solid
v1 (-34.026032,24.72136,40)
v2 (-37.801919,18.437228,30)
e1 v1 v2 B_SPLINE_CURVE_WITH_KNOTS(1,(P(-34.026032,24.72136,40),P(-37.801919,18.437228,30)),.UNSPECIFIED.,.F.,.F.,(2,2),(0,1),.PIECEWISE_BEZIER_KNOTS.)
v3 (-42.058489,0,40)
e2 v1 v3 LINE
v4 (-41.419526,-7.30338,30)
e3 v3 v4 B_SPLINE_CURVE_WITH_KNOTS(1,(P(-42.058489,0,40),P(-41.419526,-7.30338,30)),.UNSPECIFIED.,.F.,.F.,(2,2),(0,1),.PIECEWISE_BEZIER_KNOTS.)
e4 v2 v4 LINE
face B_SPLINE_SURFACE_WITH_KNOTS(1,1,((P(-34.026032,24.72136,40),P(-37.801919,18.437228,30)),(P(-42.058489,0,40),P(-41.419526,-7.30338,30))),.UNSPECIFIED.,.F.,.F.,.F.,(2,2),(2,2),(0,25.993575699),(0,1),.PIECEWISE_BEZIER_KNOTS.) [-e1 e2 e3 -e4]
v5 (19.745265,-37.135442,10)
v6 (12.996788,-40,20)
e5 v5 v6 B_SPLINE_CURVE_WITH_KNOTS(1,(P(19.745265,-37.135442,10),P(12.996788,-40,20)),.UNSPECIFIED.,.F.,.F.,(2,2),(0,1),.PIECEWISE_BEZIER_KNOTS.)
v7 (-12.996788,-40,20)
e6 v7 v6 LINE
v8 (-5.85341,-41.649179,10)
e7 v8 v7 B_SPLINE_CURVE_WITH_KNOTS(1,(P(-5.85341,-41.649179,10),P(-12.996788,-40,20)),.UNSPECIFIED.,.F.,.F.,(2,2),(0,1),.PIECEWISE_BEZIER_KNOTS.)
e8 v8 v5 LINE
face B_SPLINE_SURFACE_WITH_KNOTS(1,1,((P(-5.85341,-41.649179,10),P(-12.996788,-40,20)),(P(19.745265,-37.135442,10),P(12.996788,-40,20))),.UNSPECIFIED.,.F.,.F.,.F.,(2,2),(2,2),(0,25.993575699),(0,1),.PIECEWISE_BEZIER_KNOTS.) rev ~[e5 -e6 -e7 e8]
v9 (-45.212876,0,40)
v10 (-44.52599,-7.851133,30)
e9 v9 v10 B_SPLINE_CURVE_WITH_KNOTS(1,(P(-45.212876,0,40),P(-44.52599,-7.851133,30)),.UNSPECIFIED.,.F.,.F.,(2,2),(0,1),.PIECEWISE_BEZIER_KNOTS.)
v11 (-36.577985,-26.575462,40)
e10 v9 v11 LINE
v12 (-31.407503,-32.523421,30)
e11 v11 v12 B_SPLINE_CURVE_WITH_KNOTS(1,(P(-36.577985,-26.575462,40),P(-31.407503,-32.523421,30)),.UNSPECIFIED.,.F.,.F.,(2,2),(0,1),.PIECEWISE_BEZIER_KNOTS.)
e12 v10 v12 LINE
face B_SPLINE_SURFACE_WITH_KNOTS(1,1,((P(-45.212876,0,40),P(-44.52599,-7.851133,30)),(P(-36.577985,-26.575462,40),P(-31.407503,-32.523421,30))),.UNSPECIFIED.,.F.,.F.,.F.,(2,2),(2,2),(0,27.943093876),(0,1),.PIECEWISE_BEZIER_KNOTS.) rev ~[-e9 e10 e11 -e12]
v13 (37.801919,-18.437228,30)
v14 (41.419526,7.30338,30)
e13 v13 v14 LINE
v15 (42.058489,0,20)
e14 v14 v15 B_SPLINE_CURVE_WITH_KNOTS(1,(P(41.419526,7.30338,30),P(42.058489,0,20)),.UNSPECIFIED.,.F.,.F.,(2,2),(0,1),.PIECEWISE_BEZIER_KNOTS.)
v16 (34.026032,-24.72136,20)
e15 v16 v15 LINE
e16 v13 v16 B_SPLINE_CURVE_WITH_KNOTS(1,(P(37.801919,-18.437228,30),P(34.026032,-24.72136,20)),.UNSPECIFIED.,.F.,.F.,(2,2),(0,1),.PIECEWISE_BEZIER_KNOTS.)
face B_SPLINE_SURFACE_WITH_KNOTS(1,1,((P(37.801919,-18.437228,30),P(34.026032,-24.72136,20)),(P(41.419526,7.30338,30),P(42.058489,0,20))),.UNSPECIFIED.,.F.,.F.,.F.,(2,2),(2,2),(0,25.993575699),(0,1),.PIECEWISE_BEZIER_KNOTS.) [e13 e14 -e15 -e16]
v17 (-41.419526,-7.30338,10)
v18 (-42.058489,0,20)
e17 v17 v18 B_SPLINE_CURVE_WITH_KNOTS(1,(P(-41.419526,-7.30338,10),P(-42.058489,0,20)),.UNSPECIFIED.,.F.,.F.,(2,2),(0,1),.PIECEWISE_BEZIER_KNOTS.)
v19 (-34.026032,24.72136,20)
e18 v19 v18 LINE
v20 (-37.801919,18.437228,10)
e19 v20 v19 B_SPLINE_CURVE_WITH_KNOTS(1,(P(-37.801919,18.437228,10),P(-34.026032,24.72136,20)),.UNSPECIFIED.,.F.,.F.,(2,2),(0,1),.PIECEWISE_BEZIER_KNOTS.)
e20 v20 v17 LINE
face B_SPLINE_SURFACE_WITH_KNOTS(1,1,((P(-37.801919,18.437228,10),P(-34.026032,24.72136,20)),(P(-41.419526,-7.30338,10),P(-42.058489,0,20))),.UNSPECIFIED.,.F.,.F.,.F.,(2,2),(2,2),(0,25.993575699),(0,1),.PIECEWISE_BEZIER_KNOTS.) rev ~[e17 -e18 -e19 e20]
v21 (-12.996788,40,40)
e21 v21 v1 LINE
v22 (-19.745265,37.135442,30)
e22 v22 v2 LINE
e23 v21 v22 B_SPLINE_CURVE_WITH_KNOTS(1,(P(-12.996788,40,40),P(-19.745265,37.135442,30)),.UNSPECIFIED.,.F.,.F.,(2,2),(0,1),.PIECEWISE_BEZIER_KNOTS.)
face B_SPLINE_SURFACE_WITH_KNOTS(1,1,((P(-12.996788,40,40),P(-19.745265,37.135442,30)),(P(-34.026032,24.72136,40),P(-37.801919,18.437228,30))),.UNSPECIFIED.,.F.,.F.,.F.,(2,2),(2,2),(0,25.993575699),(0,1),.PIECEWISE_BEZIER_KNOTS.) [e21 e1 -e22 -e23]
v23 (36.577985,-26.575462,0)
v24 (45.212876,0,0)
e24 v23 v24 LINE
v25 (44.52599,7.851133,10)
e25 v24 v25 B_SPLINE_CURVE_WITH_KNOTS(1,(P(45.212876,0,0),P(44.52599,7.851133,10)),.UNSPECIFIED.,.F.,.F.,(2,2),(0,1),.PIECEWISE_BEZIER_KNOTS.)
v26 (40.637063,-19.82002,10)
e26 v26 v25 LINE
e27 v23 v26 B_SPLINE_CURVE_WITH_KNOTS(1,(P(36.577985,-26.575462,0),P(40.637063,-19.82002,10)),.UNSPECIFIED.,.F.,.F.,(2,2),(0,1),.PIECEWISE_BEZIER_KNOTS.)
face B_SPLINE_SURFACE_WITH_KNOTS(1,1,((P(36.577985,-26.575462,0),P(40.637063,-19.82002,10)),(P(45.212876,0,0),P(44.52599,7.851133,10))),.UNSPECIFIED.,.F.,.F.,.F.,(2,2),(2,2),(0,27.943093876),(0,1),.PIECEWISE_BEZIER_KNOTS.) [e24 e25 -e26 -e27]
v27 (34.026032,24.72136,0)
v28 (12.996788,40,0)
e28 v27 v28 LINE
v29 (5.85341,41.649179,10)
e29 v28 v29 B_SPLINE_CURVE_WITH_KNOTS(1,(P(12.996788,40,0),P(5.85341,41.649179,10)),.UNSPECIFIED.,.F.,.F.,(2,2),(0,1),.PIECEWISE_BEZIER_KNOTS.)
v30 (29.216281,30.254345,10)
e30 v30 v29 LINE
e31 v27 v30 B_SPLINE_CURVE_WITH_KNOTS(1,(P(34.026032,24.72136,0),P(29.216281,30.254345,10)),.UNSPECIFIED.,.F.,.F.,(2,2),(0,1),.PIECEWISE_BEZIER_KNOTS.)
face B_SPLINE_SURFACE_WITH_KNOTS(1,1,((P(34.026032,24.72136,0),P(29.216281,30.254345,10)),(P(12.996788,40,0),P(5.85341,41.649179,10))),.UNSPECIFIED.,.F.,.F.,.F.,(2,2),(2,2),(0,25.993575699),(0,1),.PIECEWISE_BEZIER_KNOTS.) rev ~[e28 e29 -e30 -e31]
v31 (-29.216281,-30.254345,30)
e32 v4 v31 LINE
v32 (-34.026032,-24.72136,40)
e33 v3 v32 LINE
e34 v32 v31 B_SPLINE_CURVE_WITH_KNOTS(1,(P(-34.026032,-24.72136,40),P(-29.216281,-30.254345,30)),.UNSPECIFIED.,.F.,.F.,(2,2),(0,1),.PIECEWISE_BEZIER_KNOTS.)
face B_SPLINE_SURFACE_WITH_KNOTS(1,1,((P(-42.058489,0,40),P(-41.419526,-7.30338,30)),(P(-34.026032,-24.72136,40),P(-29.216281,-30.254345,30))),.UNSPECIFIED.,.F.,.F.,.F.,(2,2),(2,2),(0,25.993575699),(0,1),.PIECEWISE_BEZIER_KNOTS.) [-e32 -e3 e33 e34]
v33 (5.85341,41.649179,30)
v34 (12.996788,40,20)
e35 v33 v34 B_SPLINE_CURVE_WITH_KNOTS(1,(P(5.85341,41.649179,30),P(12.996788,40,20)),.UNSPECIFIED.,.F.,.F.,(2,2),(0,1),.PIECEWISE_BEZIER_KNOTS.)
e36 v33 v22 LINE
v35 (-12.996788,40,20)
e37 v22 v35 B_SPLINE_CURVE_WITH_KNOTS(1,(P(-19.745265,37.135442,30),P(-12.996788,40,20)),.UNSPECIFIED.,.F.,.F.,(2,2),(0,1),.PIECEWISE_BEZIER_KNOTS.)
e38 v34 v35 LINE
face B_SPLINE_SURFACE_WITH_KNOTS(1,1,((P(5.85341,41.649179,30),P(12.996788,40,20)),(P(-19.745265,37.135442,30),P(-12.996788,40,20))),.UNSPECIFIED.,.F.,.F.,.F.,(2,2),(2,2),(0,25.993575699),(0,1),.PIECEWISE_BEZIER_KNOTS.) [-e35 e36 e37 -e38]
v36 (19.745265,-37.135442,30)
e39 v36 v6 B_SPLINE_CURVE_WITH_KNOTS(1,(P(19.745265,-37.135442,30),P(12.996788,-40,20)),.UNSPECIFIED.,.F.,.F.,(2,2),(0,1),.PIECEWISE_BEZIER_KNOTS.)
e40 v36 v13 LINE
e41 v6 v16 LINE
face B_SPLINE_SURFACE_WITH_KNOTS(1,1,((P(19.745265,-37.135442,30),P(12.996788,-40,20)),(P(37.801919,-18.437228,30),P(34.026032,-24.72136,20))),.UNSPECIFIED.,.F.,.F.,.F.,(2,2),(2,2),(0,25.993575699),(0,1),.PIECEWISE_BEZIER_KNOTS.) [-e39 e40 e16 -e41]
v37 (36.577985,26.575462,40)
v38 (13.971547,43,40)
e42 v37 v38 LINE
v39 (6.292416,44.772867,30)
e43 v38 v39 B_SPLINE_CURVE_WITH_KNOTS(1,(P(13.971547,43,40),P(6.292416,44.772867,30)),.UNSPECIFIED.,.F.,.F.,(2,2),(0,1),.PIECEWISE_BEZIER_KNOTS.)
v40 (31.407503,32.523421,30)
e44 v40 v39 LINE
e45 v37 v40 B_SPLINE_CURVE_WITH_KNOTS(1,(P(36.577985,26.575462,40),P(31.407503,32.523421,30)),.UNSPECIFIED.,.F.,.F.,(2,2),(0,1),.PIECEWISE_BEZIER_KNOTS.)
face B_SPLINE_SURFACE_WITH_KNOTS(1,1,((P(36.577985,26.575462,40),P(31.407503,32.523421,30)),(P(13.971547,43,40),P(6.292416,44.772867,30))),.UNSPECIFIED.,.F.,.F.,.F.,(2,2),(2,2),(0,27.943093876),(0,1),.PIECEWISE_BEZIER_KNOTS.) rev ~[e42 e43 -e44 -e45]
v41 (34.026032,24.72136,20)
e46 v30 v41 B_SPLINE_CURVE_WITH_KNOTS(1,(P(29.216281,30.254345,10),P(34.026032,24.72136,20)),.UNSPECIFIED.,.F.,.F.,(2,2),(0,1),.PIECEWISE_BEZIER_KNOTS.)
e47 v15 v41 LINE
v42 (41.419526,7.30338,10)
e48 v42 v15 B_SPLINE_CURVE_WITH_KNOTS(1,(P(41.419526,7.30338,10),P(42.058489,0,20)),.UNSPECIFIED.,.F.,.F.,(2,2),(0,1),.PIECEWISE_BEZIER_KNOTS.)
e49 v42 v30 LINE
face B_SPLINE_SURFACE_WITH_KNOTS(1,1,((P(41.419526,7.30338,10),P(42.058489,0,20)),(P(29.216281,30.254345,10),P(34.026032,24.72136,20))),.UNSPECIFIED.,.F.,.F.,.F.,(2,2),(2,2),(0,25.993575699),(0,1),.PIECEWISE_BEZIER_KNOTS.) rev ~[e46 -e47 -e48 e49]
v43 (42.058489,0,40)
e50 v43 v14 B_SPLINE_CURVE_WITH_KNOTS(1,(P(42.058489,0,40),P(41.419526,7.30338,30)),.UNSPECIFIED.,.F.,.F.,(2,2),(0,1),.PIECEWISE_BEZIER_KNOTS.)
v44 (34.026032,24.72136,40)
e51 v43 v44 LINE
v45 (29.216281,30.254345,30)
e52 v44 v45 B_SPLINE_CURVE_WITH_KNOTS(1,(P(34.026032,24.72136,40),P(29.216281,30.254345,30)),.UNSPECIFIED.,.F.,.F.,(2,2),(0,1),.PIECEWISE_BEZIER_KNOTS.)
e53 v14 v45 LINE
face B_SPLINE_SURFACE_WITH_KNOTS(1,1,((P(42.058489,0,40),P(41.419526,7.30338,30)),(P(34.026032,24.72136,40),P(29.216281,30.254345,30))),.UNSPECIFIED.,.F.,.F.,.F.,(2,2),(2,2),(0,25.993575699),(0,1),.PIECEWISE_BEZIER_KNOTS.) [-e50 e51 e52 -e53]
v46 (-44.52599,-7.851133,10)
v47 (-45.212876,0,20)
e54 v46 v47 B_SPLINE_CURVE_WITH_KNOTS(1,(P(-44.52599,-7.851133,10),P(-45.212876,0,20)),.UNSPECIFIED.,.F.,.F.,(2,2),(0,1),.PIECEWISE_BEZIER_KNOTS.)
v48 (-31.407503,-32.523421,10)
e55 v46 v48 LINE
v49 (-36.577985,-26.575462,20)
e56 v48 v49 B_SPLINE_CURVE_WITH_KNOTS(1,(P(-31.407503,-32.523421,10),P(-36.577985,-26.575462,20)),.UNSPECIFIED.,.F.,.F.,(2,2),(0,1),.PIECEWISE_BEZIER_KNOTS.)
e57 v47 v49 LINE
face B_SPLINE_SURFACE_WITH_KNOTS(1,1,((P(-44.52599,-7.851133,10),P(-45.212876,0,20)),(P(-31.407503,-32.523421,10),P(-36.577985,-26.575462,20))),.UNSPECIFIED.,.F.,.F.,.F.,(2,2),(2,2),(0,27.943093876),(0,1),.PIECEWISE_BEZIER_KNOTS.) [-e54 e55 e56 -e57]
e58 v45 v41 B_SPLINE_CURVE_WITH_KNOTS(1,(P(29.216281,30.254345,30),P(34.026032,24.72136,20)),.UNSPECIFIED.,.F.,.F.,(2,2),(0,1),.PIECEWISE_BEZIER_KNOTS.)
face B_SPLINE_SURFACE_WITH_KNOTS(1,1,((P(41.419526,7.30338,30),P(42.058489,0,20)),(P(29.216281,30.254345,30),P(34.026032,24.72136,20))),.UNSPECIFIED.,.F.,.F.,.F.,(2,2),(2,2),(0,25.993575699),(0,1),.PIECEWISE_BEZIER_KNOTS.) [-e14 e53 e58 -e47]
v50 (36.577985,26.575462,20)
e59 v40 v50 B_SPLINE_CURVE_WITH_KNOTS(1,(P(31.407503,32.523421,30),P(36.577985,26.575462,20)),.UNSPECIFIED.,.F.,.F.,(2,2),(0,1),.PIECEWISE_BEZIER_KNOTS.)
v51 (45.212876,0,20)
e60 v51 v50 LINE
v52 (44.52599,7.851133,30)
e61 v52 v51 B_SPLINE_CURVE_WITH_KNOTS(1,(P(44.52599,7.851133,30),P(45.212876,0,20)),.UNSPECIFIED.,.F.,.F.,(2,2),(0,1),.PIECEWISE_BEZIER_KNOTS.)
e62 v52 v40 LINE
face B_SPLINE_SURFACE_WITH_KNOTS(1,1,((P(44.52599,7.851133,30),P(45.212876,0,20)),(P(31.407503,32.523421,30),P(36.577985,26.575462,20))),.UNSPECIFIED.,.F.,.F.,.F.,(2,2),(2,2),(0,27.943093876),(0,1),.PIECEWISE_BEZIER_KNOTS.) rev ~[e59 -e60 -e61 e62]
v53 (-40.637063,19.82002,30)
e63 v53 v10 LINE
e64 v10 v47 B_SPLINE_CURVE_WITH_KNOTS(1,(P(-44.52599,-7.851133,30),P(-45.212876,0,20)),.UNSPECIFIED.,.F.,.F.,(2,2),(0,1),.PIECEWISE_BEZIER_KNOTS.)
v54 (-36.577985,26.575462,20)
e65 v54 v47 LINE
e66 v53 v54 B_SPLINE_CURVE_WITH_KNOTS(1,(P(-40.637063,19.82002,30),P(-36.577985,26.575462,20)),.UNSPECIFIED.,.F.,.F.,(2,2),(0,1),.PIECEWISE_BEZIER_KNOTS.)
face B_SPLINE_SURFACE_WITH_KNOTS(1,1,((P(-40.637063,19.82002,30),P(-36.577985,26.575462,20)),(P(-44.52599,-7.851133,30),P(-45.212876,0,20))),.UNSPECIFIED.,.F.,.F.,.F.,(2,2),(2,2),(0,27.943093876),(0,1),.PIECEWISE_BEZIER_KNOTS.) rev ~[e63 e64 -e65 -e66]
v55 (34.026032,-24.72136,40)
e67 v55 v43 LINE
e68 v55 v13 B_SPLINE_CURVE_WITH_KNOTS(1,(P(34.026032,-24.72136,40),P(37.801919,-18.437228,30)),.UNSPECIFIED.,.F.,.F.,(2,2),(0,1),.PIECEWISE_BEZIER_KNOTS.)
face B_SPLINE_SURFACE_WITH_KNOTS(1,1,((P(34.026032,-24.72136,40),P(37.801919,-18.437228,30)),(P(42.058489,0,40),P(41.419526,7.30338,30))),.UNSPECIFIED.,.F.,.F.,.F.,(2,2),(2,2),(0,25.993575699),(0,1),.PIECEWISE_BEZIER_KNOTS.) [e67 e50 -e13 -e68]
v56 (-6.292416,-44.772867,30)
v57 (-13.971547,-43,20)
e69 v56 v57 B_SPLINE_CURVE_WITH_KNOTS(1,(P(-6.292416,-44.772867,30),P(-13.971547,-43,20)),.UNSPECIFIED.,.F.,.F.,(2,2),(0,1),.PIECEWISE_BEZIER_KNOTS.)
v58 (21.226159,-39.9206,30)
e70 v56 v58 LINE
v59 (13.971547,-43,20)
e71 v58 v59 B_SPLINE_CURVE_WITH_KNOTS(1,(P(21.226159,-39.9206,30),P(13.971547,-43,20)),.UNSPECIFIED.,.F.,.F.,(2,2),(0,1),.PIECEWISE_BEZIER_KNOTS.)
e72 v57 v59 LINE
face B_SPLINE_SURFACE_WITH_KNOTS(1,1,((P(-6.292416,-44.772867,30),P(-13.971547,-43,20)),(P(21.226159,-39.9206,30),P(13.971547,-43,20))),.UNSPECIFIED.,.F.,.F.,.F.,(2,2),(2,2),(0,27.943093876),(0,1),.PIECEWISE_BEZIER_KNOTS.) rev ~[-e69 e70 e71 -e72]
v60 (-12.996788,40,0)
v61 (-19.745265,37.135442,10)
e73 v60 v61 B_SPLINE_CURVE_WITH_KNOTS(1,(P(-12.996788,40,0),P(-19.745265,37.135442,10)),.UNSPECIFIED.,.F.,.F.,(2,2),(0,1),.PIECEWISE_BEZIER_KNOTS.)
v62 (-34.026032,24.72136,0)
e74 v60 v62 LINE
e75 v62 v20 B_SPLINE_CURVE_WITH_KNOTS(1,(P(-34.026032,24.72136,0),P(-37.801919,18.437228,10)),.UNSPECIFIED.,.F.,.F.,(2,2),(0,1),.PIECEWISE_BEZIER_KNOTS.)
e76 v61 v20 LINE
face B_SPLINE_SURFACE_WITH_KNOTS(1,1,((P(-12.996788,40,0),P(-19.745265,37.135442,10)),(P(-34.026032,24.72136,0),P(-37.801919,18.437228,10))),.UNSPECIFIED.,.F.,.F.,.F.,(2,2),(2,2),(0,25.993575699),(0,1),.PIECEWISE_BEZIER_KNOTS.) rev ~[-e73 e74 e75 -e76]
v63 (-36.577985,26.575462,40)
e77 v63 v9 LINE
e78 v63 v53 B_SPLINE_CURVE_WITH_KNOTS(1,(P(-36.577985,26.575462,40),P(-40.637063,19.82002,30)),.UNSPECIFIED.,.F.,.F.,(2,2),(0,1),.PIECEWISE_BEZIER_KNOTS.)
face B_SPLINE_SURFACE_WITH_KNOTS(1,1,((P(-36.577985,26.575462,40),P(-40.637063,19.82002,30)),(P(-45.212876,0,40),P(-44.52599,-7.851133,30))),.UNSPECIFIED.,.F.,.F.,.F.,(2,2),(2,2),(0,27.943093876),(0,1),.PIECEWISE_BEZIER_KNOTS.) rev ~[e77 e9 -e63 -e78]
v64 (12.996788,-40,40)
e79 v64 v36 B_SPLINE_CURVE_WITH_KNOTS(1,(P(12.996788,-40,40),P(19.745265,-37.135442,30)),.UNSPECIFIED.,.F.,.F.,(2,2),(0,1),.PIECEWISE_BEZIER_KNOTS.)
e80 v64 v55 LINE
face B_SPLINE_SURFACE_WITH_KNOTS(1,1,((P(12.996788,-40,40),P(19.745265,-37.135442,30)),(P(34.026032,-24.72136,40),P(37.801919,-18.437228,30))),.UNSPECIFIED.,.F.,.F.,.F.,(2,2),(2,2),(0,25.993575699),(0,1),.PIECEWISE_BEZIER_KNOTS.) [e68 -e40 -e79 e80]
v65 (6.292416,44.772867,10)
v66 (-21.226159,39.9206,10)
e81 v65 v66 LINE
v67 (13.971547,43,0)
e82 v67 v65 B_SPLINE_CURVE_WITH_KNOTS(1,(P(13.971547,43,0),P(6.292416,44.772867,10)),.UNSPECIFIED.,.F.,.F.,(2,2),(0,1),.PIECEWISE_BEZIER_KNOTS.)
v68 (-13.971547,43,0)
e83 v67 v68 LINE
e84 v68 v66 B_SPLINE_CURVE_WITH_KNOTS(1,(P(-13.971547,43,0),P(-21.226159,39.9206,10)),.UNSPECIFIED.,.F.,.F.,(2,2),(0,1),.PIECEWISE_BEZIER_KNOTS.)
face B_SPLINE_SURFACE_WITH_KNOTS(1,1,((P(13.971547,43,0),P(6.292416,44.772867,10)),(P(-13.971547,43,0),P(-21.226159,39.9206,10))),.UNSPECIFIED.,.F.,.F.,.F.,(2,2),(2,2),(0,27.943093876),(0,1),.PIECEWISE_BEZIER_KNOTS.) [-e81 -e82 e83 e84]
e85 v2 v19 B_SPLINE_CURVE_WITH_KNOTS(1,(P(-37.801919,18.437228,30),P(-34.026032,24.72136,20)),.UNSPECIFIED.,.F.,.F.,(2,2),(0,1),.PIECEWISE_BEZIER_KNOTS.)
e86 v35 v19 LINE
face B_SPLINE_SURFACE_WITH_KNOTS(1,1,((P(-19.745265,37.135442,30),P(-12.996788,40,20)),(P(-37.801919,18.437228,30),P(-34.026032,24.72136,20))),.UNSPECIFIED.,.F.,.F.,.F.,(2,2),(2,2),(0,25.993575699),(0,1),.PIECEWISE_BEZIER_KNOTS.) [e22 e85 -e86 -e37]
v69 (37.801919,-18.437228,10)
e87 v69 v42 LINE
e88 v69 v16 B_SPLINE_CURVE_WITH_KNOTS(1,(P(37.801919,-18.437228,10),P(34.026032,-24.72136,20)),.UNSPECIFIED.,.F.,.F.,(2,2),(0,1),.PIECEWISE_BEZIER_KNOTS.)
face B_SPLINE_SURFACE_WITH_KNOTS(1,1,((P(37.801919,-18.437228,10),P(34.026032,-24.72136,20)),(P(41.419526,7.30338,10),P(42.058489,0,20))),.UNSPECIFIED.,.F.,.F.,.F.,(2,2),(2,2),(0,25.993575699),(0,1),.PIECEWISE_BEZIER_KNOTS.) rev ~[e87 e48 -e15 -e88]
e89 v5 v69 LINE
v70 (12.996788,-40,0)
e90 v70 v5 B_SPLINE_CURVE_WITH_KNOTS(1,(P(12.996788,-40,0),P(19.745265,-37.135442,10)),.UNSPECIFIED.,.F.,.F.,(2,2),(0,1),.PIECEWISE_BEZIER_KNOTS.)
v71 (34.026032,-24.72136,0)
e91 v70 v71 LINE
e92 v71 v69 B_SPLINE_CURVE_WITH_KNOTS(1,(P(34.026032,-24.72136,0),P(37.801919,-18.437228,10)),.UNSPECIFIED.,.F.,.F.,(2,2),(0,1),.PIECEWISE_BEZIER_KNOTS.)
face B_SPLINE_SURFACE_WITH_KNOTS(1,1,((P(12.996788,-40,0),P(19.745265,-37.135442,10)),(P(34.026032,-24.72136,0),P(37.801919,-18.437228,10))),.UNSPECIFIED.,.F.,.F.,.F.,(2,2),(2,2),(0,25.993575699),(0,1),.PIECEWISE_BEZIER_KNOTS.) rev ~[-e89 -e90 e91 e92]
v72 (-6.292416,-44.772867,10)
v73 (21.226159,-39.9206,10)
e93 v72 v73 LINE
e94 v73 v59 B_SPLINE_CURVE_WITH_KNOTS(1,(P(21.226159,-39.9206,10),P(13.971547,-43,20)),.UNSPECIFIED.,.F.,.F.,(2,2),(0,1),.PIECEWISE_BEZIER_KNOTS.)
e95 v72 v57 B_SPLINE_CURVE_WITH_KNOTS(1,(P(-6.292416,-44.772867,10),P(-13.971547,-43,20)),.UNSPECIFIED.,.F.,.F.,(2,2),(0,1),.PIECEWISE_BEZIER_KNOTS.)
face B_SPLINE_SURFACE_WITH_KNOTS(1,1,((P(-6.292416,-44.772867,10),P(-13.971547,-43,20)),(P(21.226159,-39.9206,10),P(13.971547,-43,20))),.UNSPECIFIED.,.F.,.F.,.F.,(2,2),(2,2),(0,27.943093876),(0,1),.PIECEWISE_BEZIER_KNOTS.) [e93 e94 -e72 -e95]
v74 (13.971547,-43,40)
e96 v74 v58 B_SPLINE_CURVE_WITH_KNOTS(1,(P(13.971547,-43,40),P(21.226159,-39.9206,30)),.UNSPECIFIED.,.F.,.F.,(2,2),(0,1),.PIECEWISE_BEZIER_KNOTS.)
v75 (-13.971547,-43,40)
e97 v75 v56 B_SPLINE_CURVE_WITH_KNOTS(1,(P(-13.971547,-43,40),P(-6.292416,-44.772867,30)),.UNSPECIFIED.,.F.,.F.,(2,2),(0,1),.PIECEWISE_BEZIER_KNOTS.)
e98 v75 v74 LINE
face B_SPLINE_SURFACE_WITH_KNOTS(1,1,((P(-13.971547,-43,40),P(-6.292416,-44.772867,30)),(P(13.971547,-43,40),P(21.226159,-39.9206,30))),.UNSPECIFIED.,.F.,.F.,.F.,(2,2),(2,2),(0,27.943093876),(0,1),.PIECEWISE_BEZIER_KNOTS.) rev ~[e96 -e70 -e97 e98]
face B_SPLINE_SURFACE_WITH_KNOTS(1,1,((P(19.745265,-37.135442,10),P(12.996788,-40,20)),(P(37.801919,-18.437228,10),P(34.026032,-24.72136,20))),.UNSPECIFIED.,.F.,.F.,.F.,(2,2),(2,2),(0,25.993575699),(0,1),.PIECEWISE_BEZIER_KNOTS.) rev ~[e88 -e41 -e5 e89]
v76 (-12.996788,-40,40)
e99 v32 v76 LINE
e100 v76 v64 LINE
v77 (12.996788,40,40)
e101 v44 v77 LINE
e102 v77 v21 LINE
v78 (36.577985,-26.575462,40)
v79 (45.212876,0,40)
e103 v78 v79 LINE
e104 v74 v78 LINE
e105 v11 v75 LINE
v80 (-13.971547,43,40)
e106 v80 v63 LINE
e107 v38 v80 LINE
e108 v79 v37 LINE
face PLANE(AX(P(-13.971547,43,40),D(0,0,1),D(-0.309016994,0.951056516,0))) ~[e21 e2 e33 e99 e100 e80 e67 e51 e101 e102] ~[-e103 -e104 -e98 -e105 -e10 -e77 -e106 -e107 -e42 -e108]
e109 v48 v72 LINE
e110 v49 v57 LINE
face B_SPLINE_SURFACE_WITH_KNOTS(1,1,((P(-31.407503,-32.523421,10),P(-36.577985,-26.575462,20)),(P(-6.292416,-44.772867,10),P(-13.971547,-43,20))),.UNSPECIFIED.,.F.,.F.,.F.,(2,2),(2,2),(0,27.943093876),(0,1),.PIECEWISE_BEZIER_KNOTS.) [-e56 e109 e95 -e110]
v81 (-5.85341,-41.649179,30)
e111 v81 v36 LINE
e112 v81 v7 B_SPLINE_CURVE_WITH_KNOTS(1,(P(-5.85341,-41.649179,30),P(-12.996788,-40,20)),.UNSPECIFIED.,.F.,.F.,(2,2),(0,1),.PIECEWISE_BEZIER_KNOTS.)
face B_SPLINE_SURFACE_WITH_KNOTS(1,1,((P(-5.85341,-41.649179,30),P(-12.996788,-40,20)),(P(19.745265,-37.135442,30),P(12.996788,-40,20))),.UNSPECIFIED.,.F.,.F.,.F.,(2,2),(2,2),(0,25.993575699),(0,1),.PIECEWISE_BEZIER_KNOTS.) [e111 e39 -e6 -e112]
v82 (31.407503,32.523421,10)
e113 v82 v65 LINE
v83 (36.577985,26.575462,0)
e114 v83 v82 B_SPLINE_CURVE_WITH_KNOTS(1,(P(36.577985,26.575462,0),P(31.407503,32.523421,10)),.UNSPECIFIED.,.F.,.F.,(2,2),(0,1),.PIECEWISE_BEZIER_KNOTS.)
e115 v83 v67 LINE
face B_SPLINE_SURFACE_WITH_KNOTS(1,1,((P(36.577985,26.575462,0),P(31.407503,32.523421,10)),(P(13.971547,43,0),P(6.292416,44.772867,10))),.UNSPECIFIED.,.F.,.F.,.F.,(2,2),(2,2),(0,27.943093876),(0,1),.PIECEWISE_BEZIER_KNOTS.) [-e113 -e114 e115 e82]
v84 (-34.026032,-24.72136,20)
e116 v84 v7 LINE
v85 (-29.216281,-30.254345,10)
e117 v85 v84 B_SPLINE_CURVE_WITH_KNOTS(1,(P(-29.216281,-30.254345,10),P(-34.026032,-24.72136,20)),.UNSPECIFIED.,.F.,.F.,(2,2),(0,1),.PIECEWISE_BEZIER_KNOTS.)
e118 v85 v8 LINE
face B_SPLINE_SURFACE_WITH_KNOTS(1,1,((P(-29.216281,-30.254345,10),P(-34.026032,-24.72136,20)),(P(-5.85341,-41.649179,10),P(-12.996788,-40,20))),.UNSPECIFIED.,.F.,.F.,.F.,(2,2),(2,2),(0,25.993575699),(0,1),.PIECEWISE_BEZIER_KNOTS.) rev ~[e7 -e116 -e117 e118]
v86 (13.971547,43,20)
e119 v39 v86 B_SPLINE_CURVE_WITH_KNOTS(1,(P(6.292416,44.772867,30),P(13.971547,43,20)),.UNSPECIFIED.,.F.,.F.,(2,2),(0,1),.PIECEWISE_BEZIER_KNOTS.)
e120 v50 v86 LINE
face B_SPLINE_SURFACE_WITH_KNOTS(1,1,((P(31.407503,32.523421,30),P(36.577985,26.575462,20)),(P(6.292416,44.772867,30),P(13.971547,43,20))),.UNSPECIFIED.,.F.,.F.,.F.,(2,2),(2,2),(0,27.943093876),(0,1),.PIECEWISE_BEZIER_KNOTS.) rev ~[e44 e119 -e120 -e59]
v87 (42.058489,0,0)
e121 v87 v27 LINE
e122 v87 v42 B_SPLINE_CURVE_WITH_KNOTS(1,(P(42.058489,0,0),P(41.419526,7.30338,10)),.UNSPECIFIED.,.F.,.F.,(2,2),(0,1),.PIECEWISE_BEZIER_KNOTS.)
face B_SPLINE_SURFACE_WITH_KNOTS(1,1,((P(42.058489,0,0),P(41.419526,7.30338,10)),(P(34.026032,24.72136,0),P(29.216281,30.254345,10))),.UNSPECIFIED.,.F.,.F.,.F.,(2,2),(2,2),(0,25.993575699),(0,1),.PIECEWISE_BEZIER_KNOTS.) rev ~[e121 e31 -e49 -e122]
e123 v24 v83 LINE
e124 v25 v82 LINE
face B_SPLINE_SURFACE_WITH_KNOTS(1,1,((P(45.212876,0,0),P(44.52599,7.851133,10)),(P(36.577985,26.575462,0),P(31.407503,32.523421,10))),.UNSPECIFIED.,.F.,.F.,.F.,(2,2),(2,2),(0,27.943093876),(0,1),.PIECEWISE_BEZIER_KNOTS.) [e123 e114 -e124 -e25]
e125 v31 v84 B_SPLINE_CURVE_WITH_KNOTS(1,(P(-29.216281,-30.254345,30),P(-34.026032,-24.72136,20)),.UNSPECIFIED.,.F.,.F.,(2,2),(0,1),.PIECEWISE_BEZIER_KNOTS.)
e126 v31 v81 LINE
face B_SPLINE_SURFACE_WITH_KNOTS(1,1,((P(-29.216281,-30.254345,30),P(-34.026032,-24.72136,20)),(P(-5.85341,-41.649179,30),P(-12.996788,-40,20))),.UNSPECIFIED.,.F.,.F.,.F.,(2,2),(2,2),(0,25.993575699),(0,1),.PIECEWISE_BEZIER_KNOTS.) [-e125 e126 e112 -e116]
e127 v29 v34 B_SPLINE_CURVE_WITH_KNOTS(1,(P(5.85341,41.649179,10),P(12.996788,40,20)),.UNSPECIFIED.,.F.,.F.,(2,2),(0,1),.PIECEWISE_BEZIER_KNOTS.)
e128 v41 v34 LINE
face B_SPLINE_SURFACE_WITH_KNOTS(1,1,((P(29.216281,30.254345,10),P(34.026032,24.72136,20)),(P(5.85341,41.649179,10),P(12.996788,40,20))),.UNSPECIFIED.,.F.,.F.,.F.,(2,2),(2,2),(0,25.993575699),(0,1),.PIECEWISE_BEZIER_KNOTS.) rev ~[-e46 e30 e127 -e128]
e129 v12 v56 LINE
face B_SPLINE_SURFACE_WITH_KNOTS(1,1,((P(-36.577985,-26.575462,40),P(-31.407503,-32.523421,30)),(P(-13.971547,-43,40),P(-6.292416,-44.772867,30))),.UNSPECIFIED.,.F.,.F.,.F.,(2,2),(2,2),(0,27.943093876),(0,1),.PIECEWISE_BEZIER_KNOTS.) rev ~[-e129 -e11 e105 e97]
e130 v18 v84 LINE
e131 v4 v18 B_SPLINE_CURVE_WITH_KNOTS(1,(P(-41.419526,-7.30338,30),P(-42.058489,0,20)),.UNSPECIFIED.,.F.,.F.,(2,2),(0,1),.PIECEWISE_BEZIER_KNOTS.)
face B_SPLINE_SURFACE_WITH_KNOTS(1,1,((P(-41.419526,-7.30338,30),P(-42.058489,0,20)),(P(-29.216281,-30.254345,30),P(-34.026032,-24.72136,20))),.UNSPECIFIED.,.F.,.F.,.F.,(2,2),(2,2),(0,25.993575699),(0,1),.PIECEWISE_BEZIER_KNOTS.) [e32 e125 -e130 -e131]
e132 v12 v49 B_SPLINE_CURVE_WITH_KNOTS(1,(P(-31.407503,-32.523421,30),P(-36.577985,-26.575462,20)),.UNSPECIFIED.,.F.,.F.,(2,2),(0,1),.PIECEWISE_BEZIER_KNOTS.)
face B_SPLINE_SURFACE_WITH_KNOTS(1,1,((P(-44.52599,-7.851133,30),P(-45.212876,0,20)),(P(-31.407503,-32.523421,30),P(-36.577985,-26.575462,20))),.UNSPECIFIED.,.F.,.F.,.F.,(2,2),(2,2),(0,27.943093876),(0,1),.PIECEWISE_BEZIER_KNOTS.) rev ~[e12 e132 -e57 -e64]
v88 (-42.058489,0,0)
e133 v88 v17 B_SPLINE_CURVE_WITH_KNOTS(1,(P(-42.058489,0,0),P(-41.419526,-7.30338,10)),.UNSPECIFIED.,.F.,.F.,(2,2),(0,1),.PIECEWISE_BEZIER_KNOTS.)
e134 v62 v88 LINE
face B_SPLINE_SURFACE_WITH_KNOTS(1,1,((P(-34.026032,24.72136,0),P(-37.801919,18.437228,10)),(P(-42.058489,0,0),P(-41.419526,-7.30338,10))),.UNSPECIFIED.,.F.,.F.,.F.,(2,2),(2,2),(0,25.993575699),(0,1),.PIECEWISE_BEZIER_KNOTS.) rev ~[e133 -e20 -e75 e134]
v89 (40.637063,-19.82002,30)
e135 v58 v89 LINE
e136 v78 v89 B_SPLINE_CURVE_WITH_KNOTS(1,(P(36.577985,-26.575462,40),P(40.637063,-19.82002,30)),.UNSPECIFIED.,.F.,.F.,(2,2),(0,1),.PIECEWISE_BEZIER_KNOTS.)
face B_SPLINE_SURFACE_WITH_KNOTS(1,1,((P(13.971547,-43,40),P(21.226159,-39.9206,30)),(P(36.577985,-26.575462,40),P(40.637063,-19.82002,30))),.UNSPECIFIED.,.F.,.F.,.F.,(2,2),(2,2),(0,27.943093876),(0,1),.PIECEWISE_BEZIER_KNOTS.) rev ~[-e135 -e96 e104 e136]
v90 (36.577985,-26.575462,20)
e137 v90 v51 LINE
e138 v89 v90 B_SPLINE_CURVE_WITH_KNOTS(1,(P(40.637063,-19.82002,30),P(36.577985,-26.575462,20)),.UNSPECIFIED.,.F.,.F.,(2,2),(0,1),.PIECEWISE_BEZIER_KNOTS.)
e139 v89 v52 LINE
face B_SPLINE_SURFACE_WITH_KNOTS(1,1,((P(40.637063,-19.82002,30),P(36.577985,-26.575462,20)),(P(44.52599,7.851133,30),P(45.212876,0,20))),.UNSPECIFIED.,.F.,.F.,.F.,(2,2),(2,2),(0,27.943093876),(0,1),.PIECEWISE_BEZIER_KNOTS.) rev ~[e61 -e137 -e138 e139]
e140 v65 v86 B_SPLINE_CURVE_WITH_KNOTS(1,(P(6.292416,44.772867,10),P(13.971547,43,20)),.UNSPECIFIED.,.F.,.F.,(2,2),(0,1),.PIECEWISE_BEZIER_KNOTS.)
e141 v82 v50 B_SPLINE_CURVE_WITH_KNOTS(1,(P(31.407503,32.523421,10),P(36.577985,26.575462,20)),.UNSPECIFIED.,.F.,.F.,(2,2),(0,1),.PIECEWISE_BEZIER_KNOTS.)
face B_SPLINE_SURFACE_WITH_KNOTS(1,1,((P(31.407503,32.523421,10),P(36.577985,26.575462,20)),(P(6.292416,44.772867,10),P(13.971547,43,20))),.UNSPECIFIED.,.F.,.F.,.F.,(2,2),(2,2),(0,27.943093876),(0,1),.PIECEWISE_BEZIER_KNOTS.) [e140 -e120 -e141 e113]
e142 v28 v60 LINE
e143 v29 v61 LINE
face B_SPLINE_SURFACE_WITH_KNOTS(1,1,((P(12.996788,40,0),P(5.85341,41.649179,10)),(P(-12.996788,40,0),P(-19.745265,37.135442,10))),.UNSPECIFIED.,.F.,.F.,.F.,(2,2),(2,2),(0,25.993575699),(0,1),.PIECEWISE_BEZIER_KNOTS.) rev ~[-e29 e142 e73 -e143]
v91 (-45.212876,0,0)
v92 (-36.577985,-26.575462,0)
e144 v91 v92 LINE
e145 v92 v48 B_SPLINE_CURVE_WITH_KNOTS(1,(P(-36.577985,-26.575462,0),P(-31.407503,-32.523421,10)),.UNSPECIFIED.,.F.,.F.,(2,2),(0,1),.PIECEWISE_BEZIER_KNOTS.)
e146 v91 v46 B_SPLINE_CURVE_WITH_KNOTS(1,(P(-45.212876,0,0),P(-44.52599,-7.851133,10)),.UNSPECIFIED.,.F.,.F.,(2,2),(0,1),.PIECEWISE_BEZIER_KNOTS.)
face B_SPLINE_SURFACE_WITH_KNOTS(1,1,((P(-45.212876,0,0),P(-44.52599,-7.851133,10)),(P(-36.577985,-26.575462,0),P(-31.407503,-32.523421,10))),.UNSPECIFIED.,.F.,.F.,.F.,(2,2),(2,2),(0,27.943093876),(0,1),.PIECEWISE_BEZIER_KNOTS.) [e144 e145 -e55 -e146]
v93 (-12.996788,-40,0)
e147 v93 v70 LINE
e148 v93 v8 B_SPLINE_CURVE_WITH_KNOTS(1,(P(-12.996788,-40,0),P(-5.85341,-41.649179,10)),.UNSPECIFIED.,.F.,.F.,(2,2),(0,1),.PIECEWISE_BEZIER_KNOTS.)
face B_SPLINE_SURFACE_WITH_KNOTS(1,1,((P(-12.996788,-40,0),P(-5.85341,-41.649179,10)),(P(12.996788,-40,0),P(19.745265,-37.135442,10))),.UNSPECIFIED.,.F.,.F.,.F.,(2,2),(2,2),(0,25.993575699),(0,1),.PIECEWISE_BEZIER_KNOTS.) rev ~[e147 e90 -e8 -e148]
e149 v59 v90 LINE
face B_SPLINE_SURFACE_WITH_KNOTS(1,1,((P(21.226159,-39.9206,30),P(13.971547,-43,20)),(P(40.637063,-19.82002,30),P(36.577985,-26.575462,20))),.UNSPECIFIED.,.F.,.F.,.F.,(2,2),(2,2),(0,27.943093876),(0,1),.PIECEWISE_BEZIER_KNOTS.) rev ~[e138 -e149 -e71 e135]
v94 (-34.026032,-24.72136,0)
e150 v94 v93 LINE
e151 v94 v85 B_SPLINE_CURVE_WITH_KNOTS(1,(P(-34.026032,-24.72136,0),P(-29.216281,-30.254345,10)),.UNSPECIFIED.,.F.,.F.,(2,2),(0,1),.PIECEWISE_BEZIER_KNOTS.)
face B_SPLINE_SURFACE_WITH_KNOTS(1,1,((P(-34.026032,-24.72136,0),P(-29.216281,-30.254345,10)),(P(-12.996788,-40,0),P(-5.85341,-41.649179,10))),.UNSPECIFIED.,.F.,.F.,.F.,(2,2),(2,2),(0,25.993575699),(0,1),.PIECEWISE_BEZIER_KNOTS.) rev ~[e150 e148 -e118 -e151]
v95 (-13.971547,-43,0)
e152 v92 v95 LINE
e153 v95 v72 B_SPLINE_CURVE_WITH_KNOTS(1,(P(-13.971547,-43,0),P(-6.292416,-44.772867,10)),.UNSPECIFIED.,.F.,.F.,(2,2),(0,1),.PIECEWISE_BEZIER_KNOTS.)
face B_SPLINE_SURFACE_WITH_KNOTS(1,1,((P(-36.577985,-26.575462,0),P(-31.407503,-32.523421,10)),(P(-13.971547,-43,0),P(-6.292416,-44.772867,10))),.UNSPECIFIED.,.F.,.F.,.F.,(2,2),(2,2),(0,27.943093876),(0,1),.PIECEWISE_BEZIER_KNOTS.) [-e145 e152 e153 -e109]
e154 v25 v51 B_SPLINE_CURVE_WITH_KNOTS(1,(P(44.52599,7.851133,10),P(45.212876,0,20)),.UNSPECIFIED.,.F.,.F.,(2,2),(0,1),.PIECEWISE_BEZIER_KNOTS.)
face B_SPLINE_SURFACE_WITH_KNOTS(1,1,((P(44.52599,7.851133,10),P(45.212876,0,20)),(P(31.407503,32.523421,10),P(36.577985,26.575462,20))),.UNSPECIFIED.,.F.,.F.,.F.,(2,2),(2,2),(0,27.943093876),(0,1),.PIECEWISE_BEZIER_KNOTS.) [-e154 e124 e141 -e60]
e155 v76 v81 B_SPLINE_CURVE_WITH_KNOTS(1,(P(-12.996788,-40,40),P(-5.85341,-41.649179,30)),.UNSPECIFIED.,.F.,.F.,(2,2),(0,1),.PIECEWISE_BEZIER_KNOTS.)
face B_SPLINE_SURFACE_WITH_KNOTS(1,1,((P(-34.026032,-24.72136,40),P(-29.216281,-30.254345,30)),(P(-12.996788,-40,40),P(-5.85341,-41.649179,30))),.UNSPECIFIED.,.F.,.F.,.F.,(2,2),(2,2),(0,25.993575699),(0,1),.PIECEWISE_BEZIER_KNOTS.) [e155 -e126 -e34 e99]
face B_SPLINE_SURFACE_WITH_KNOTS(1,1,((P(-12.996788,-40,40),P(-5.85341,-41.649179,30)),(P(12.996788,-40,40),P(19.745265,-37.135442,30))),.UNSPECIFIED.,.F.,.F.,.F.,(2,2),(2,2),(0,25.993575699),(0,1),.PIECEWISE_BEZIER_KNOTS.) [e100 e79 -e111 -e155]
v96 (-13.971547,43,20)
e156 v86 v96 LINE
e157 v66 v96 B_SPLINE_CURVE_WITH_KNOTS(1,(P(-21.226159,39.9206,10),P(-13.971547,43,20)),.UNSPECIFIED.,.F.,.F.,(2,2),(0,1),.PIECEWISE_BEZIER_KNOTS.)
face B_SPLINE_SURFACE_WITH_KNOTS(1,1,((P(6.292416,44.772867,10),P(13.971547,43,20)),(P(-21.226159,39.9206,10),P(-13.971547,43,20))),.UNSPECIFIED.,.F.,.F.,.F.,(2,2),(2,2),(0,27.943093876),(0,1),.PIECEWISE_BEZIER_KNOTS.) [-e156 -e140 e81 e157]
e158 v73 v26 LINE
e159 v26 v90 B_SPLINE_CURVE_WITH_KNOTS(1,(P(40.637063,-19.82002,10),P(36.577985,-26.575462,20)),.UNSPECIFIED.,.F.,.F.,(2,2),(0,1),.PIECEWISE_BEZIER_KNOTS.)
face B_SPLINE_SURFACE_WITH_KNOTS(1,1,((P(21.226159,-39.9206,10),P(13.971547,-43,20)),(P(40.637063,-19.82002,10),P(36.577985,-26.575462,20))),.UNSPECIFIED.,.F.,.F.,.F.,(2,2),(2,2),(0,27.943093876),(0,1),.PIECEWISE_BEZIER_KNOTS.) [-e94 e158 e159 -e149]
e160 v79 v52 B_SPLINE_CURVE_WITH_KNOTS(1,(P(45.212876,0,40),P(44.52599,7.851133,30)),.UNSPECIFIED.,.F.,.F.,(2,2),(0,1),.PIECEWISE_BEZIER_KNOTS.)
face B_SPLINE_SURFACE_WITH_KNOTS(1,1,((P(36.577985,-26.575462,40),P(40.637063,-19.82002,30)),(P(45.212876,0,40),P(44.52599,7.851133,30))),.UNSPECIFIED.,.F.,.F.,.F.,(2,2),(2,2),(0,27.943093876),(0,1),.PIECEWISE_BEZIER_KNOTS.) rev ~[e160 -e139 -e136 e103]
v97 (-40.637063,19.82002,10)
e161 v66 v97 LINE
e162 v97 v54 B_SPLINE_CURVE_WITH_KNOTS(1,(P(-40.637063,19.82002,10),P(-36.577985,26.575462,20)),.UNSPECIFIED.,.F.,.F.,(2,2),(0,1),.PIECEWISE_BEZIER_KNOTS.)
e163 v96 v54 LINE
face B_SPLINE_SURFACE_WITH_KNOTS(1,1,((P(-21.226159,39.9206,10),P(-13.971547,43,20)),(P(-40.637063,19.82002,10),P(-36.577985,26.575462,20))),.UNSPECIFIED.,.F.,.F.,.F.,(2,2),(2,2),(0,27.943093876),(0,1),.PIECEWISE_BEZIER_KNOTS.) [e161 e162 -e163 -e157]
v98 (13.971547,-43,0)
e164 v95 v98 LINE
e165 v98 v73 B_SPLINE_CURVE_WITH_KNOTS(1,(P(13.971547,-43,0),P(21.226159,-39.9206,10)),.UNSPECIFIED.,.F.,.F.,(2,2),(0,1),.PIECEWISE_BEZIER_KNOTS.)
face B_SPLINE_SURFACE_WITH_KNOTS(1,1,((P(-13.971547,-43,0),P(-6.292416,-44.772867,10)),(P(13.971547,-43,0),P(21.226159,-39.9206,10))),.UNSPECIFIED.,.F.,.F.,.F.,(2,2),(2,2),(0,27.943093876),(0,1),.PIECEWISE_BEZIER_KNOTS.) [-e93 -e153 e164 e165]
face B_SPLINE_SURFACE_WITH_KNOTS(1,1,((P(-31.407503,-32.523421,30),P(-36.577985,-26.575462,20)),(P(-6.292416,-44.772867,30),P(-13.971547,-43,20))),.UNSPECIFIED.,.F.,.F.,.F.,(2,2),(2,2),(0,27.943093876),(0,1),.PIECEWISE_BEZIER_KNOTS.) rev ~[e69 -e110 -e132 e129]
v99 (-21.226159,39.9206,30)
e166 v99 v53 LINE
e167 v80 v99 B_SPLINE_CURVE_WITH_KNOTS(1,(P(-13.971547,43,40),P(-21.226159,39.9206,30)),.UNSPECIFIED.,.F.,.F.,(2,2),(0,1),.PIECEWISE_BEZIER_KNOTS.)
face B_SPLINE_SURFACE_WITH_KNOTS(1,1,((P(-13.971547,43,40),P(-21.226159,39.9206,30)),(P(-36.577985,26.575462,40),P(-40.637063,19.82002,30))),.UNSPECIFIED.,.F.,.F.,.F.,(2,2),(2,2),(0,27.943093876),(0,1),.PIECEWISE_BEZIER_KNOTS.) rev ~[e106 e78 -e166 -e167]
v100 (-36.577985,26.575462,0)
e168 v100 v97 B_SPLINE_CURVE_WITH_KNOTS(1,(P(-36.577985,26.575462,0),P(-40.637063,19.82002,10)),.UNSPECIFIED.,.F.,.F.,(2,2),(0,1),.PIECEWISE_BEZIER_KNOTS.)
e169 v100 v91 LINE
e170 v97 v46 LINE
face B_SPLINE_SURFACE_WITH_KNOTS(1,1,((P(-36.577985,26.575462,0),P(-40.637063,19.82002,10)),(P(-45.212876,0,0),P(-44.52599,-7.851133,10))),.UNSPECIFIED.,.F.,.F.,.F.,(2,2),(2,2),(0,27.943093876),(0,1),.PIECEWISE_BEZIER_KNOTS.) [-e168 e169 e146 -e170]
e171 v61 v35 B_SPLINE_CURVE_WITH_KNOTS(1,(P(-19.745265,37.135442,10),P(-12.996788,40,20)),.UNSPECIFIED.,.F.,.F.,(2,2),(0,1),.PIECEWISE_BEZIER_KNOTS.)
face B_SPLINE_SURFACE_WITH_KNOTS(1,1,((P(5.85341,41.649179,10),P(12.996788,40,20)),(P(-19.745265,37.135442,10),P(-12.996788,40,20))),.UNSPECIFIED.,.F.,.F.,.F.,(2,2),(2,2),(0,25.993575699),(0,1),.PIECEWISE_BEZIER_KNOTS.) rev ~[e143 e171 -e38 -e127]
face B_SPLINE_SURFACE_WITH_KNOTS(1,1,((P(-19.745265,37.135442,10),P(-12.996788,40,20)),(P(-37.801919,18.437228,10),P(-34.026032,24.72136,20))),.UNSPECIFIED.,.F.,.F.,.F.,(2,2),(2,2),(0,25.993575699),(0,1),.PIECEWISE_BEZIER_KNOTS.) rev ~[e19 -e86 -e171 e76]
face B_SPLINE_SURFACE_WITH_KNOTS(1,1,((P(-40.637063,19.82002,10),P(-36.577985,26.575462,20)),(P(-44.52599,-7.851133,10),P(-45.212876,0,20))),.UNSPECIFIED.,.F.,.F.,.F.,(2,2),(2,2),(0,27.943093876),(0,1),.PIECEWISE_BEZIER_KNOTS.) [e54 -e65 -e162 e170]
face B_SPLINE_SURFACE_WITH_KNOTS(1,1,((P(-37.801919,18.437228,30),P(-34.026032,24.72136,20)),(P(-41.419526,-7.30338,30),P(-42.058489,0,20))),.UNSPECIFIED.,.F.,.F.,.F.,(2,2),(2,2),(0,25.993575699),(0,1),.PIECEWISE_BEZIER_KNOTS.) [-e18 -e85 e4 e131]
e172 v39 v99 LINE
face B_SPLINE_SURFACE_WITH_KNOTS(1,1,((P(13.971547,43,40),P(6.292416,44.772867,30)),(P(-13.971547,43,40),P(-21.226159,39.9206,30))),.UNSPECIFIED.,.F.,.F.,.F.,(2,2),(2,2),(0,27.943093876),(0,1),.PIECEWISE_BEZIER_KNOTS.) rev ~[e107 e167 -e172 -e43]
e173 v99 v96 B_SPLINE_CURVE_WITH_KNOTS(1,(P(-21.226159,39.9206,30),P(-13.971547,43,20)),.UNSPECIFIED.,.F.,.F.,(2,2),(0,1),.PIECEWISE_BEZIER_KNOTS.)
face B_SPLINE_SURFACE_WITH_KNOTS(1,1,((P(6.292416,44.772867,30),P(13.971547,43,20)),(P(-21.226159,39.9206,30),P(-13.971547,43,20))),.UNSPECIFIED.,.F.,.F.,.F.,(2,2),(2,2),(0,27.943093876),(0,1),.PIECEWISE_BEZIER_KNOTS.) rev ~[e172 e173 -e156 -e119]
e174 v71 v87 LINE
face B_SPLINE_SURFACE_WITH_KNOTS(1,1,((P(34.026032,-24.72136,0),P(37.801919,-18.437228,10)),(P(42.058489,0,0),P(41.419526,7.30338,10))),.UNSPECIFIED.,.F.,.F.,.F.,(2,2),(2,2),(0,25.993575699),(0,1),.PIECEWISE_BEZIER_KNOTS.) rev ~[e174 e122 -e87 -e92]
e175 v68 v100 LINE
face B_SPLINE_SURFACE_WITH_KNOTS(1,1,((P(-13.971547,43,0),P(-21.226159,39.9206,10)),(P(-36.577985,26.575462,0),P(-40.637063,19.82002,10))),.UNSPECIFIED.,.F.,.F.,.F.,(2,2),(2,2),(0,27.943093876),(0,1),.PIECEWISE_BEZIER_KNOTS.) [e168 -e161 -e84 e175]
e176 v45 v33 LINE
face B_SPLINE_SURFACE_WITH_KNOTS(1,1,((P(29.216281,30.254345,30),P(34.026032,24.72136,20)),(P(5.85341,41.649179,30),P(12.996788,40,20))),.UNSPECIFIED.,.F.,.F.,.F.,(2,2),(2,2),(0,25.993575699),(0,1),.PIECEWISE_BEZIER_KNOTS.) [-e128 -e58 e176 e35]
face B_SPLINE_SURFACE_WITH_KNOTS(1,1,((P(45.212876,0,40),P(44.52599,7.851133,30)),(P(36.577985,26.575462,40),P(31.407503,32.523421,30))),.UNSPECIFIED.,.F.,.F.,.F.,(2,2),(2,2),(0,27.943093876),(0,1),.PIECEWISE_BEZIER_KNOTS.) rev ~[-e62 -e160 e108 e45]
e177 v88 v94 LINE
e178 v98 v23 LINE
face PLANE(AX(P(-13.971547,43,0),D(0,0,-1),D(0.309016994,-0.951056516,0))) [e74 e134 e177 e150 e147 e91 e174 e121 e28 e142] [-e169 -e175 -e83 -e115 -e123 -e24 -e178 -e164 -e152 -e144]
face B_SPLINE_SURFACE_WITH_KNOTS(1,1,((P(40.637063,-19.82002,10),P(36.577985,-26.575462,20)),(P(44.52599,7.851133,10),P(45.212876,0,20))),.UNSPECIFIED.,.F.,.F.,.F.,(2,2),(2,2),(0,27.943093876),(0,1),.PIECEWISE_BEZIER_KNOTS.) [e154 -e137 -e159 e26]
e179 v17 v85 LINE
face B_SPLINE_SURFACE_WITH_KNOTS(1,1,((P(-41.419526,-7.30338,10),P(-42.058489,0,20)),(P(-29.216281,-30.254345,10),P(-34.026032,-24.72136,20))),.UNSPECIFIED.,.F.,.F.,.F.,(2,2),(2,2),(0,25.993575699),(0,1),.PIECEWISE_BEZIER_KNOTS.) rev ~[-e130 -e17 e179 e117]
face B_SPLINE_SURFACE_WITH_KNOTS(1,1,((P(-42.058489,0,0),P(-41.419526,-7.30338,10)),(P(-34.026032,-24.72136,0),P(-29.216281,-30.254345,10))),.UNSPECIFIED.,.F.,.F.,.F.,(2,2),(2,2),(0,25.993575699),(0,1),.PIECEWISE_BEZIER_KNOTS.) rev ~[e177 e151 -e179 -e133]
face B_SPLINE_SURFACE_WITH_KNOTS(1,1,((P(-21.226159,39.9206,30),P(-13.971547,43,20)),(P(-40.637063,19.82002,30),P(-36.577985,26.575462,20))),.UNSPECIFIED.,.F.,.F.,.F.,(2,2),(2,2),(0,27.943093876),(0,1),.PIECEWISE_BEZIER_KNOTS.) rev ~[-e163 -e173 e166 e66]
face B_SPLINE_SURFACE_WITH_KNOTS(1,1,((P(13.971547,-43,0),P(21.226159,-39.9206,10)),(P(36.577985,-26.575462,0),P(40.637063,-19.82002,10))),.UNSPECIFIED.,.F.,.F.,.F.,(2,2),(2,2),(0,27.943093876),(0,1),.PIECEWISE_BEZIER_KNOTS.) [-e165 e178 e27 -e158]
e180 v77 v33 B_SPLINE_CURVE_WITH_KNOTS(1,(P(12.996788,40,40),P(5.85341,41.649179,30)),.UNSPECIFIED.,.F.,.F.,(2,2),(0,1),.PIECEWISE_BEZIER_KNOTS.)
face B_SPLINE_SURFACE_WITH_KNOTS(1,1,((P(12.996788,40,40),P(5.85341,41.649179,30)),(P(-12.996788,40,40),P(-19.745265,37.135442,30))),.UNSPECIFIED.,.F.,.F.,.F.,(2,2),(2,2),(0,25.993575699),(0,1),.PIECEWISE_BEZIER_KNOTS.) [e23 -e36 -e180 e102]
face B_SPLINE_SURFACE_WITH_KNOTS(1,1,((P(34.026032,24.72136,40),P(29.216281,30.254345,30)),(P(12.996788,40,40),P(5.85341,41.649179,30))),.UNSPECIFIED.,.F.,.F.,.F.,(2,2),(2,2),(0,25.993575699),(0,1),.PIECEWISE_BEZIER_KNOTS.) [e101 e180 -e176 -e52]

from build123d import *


with BuildPart() as f5:
    # F0 (on Top) → F5 section 0
    with BuildSketch(Plane.XY):
        Polygon((12.9967878493, 40), (-12.9967878493, 40), (-34.0260323341, 24.72135955), (-42.0584889695, 0), (-34.0260323341, -24.72135955), (-12.9967878493, -40), (12.9967878493, -40), (34.0260323341, -24.72135955), (42.0584889695, 0), (34.0260323341, 24.72135955), align=None)
    # F3 (on offset) → F5 section 1
    with BuildSketch(Plane.XY.offset(10)):
        Polygon((-29.2162814115, -30.2543450579), (-5.8534103316, -41.649178646), (19.7452645449, -37.1354415949), (37.8019194822, -18.4372280418), (41.4195260172, 7.303379965), (29.2162814115, 30.2543450579), (5.8534103316, 41.649178646), (-19.7452645449, 37.1354415949), (-37.8019194822, 18.4372280418), (-41.4195260172, -7.303379965), align=None)
    loft()


with BuildPart() as f6:
    # F1 (on Top) → F6 section 0
    with BuildSketch(Plane.XY):
        Polygon((-13.971546938, 43), (-36.5779847591, 26.5754615162), (-45.2128756422, 0), (-36.5779847591, -26.5754615162), (-13.971546938, -43), (13.971546938, -43), (36.5779847591, -26.5754615162), (45.2128756422, 0), (36.5779847591, 26.5754615162), (13.971546938, 43), align=None)
    # F4 (on offset) → F6 section 1
    with BuildSketch(Plane.XY.offset(10)):
        Polygon((-21.2261593858, 39.9205997146), (-40.6370634433, 19.8200201449), (-44.5259904685, -7.8511334624), (-31.4075025174, -32.5234209372), (-6.2924161065, -44.7728670445), (21.2261593858, -39.9205997146), (40.6370634433, -19.8200201449), (44.5259904685, 7.8511334624), (31.4075025174, 32.5234209372), (6.2924161065, 44.7728670445), align=None)
    loft()

    # F7: cut F5
    add(f5.part, mode=Mode.SUBTRACT)

    # F11 (on face) → F14 section 0
    with BuildSketch(Plane.XY.offset(10)):
        Polygon((-44.5259904685, -7.8511334624), (-31.4075025174, -32.5234209372), (-6.2924161065, -44.7728670445), (21.2261593858, -39.9205997146), (40.6370634433, -19.8200201449), (44.5259904685, 7.8511334624), (31.4075025174, 32.5234209372), (6.2924161065, 44.7728670445), (-21.2261593858, 39.9205997146), (-40.6370634433, 19.8200201449), align=None)
    # F10 (on offset) → F14 section 1
    with BuildSketch(Plane.XY.offset(20)):
        Polygon((-13.971546938, 43), (-36.5779847591, 26.5754615162), (-45.2128756422, 0), (-36.5779847591, -26.5754615162), (-13.971546938, -43), (13.971546938, -43), (36.5779847591, -26.5754615162), (45.2128756422, 0), (36.5779847591, 26.5754615162), (13.971546938, 43), align=None)
    loft()


with BuildPart() as f13:
    # F12 (on offset) → F13 section 0
    with BuildSketch(Plane.XY.offset(10)):
        Polygon((-19.7452645449, 37.1354415949), (-37.8019194822, 18.4372280418), (-41.4195260172, -7.303379965), (-29.2162814115, -30.2543450579), (-5.8534103316, -41.649178646), (19.7452645449, -37.1354415949), (37.8019194822, -18.4372280418), (41.4195260172, 7.303379965), (29.2162814115, 30.2543450579), (5.8534103316, 41.649178646), align=None)
    # F9 (on offset) → F13 section 1
    with BuildSketch(Plane.XY.offset(20)):
        Polygon((12.9967878493, 40), (-12.9967878493, 40), (-34.0260323341, 24.72135955), (-42.0584889695, 0), (-34.0260323341, -24.72135955), (-12.9967878493, -40), (12.9967878493, -40), (34.0260323341, -24.72135955), (42.0584889695, 0), (34.0260323341, 24.72135955), align=None)
    loft()


with BuildPart() as f6_1:
    add(f6.part)

    # F15: cut F13
    add(f13.part, mode=Mode.SUBTRACT)

    # F16: F6 across face


with BuildPart() as f6_2:
    add(f6_1.part)
    add(f6_1.part.mirror(Plane.XY.offset(20)))


solid = f6_2.part
